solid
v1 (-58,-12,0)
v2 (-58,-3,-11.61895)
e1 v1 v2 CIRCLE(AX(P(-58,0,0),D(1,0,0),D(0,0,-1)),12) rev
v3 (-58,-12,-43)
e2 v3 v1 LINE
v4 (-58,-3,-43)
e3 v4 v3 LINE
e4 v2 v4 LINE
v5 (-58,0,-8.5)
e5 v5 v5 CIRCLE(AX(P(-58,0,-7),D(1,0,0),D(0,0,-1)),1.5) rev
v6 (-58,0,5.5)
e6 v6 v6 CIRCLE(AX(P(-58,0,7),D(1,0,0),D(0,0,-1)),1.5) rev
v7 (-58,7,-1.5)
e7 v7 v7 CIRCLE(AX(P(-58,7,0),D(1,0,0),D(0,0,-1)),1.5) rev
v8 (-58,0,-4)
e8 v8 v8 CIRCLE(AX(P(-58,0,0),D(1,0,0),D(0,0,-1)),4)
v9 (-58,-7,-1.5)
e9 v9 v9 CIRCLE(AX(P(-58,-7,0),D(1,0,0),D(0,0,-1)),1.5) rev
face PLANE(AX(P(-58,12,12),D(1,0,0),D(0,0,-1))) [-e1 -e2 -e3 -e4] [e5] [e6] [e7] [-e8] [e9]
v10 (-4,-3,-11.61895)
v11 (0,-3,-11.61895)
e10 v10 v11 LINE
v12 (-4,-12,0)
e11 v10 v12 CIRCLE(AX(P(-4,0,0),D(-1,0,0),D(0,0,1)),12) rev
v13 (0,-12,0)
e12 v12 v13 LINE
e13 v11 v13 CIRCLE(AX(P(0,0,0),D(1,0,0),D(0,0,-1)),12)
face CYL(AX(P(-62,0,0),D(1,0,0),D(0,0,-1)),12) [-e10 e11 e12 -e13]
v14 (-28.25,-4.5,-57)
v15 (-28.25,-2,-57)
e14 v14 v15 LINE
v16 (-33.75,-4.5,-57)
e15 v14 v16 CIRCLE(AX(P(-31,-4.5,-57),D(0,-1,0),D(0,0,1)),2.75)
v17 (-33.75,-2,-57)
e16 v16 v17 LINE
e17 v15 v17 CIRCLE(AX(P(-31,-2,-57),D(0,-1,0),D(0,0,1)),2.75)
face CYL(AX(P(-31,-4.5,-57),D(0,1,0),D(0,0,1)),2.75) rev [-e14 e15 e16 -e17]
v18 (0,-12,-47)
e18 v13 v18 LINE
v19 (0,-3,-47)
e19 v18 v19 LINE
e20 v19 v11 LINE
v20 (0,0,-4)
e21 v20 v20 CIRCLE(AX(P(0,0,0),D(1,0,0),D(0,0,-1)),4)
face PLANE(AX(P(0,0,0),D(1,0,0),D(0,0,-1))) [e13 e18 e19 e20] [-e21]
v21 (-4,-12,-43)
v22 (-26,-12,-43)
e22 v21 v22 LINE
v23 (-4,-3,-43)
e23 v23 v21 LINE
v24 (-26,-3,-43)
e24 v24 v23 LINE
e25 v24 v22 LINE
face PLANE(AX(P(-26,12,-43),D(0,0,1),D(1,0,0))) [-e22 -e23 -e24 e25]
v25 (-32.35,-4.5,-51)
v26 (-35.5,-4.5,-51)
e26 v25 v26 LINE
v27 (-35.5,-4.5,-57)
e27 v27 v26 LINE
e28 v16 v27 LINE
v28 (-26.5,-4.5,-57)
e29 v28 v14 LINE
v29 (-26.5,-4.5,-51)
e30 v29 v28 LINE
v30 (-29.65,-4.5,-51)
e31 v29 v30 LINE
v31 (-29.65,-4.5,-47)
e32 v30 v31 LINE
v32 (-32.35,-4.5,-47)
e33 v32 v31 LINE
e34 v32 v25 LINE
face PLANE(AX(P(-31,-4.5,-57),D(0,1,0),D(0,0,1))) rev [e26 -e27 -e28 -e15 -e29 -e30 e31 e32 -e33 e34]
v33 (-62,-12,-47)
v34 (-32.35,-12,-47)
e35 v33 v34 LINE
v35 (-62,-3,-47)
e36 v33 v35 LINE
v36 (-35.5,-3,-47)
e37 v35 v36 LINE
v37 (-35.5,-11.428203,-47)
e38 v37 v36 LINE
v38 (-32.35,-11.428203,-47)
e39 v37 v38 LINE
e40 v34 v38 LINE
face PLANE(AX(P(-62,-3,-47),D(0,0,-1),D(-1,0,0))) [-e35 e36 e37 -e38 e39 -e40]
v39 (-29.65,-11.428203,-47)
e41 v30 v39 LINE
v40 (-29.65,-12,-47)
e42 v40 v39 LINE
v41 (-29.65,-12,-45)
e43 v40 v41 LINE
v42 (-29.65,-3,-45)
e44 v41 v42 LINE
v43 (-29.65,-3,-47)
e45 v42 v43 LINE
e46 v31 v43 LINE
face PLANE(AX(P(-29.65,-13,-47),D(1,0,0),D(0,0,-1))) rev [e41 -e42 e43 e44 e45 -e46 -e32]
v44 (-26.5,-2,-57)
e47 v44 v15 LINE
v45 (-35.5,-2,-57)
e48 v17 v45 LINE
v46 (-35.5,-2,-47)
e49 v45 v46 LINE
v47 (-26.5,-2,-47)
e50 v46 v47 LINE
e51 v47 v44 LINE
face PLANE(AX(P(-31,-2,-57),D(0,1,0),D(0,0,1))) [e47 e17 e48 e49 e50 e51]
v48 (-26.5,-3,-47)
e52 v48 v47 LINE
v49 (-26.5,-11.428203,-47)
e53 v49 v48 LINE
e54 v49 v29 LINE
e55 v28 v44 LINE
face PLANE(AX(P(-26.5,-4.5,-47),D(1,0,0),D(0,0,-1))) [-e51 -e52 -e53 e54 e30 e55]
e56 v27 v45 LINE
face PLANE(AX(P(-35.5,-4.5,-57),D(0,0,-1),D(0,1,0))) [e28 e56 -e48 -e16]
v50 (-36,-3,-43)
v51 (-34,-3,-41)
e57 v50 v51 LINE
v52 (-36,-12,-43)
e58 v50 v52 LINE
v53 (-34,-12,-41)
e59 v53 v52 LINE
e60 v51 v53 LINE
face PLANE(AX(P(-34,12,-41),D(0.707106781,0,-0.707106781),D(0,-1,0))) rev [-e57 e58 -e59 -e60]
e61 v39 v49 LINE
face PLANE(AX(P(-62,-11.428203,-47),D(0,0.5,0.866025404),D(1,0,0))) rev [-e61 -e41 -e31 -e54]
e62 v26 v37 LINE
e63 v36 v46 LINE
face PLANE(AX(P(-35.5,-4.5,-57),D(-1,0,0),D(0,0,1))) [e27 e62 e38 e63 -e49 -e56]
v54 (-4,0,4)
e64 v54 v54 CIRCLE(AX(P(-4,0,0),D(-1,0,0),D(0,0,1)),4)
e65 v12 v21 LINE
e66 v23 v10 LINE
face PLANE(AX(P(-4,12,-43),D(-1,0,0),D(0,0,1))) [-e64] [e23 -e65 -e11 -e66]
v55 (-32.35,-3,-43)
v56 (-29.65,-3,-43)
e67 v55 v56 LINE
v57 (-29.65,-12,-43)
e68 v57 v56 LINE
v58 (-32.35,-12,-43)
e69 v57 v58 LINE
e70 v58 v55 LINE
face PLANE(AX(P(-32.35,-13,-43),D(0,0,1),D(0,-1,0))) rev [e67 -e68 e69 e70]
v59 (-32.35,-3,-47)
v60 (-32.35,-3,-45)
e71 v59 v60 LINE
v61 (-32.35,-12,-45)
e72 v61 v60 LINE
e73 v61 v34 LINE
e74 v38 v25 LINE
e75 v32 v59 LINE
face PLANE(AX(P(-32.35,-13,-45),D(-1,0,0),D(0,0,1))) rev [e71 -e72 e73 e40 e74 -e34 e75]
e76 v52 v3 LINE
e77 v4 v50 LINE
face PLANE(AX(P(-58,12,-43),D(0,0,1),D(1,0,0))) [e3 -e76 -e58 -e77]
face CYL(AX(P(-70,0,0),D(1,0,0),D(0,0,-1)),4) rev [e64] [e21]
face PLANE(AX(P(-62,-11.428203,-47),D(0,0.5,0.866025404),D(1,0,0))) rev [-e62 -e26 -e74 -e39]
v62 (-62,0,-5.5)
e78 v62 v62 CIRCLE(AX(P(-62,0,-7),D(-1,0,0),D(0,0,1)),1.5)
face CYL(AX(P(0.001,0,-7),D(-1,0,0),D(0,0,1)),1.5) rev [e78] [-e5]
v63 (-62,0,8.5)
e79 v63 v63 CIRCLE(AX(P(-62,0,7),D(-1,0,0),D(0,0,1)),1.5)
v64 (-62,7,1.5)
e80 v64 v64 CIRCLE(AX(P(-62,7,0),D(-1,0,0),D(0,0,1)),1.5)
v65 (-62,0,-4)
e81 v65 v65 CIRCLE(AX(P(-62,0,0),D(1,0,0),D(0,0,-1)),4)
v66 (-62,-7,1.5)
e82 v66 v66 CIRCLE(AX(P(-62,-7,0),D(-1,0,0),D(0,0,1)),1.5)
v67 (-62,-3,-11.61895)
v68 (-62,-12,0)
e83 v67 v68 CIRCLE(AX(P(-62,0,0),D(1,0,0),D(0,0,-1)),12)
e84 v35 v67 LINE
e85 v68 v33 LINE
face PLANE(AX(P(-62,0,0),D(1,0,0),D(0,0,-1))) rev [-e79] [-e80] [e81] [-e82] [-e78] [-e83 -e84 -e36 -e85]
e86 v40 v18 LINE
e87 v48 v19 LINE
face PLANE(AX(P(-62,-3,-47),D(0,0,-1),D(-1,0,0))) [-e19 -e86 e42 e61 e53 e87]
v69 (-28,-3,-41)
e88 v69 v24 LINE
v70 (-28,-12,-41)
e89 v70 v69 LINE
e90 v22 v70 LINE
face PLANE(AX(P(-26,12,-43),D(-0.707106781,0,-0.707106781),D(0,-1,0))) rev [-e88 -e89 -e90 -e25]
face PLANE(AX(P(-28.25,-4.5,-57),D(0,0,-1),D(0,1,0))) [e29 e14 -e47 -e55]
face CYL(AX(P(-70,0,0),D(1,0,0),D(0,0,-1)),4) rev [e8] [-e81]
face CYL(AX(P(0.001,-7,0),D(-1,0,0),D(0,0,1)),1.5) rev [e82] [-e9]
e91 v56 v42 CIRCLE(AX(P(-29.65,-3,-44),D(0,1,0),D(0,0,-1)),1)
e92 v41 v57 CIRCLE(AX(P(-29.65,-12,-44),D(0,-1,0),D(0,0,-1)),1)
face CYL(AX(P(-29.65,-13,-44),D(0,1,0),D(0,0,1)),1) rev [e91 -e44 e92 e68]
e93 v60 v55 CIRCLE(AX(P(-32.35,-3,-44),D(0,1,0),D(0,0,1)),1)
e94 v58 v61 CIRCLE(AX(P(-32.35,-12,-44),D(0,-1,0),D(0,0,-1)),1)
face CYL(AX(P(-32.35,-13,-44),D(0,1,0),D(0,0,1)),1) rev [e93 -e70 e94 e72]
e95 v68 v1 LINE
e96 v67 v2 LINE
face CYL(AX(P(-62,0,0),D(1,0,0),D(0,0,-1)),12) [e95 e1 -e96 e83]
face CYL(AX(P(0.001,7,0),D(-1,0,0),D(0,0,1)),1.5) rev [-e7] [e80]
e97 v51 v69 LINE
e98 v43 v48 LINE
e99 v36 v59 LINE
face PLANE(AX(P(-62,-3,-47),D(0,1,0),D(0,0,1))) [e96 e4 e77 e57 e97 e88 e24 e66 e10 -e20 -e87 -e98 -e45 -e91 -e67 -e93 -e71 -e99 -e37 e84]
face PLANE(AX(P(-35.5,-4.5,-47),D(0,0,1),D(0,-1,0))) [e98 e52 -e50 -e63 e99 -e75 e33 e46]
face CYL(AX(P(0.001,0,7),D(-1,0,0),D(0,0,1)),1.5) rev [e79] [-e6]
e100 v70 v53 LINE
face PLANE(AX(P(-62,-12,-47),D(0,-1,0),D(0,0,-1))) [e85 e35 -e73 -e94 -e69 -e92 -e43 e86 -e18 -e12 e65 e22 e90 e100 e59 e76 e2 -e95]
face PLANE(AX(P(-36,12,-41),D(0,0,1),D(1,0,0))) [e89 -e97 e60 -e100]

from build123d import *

# Parameters (mm, degrees)
BOSS_EXTRUDE1_DEPTH      = 62
CUT_EXTRUDE1_DEPTH       = 12
CUT_EXTRUDE1_DEPTH_BACK  = 12
BOSS_EXTRUDE2_DEPTH      = 1
BOSS_EXTRUDE2_DEPTH_BACK = 1.5
CUT_EXTRUDE3_DEPTH       = 10
CHAMFER2_SIZE            = 2
CHAMFER3_SIZE            = 2
CHAMFER4_SIZE            = 4
CHAMFER4_SIZE2           = 6.92820323
SKETCH7_R                = 4
CUT_EXTRUDE4_DEPTH       = 70
CUT_EXTRUDE5_REACH       = 87.071
SKETCH8_R                = 1.5


with BuildPart() as part:
    # Sketch1 → Boss-Extrude1 (new body)
    with BuildSketch(Plane(origin=(0, 0, 0), x_dir=(0, 0, -1), z_dir=(1, 0, 0))):
        with BuildLine():
            Line((47, -12), (0, -12))
            ThreePointArc((0, -12), (-7.348469228, 9.486832981), (11.618950039, -3))
            Line((11.618950039, -3), (47, -3))
            Line((47, -3), (47, -12))
        make_face()
    extrude(amount=-BOSS_EXTRUDE1_DEPTH)

    # Sketch2 → Cut-Extrude1 (cut, two sides: drawn at the far end of the back side and taken through both)
    with BuildSketch(Plane(origin=(0, 0, 0), x_dir=(1, 0, 0), z_dir=(0, 1, 0)).offset(-CUT_EXTRUDE1_DEPTH_BACK)):
        Polygon((-58, -12), (-58, 43), (-36, 43), (-36, 41), (-26, 41), (-26, 43), (-4, 43), (-4, -12), align=None)
    extrude(amount=CUT_EXTRUDE1_DEPTH + CUT_EXTRUDE1_DEPTH_BACK, mode=Mode.SUBTRACT)

    # Sketch3 → Boss-Extrude2 (add, two sides: drawn at the far end of the back side and taken through both)
    with BuildSketch(Plane(origin=(0, -3, 0), x_dir=(1, 0, 0), z_dir=(0, 1, 0)).offset(-BOSS_EXTRUDE2_DEPTH_BACK)):
        with BuildLine():
            Line((-35.5, 57), (-35.5, 47))
            Line((-35.5, 47), (-26.5, 47))
            Line((-26.5, 47), (-26.5, 57))
            Line((-26.5, 57), (-28.25, 57))
            ThreePointArc((-28.25, 57), (-31, 54.25), (-33.75, 57))
            Line((-33.75, 57), (-35.5, 57))
        make_face()
    extrude(amount=BOSS_EXTRUDE2_DEPTH + BOSS_EXTRUDE2_DEPTH_BACK)

    # Sketch5 → Cut-Extrude3 (cut)
    with BuildSketch(Plane(origin=(0, -3, 0), x_dir=(1, 0, 0), z_dir=(0, 1, 0))):
        with BuildLine():
            Line((-32.35, 43), (-29.65, 43))
            ThreePointArc((-29.65, 43), (-28.65, 44), (-29.65, 45))
            Line((-29.65, 45), (-29.65, 47))
            Line((-29.65, 47), (-32.35, 47))
            Line((-32.35, 47), (-32.35, 45))
            ThreePointArc((-32.35, 45), (-33.35, 44), (-32.35, 43))
        make_face()
    extrude(amount=-CUT_EXTRUDE3_DEPTH, mode=Mode.SUBTRACT)

    # Chamfer2
    chamfer2_edges = [part.edges().sort_by_distance(p)[0] for p in [
        (-26, -7.5, -41),
    ]]
    chamfer(chamfer2_edges, length=CHAMFER2_SIZE - 0.0001)  # a hair under: the kernel refuses the full size

    # Chamfer3
    chamfer3_edges = [part.edges().sort_by_distance(p)[0] for p in [
        (-36, -7.5, -41),
    ]]
    chamfer(chamfer3_edges, length=CHAMFER3_SIZE - 0.0001)  # a hair under: the kernel refuses the full size

    # Chamfer4
    chamfer4_edges = [part.edges().sort_by_distance(p)[0] for p in [
        (-33.925, -4.5, -47),
        (-28.075, -4.5, -47),
    ]]
    chamfer4_side = [part.faces().sort_by_distance(p)[0] for p in [
        (-31, -4.5, -51.417170305),
    ]]
    chamfer(chamfer4_edges, length=CHAMFER4_SIZE, length2=CHAMFER4_SIZE2, reference=chamfer4_side[0])

    # Sketch7 → Cut-Extrude4 (cut)
    with BuildSketch(Plane(origin=(0, 0, 0), x_dir=(0, 0, -1), z_dir=(1, 0, 0))):
        Circle(SKETCH7_R)
    extrude(amount=-CUT_EXTRUDE4_DEPTH, mode=Mode.SUBTRACT)

    # Sketch8 → Cut-Extrude5 (cut, up to next)
    with BuildSketch(Plane.ZY.offset(62), mode=Mode.PRIVATE) as cut_extrude5_sk1:
        with Locations((0, 7)):
            Circle(SKETCH8_R)
    cut_extrude5_tool1 = extrude(cut_extrude5_sk1.sketch, amount=-CUT_EXTRUDE5_REACH, mode=Mode.PRIVATE) & part.part
    # Sketch8 → Cut-Extrude5 (cut, up to next)
    with BuildSketch(Plane.ZY.offset(62), mode=Mode.PRIVATE) as cut_extrude5_sk2:
        with Locations((7, 0)):
            Circle(SKETCH8_R)
    cut_extrude5_tool2 = extrude(cut_extrude5_sk2.sketch, amount=-CUT_EXTRUDE5_REACH, mode=Mode.PRIVATE) & part.part
    # Sketch8 → Cut-Extrude5 (cut, up to next)
    with BuildSketch(Plane.ZY.offset(62), mode=Mode.PRIVATE) as cut_extrude5_sk3:
        with Locations((0, -7)):
            Circle(SKETCH8_R)
    cut_extrude5_tool3 = extrude(cut_extrude5_sk3.sketch, amount=-CUT_EXTRUDE5_REACH, mode=Mode.PRIVATE) & part.part
    # Sketch8 → Cut-Extrude5 (cut, up to next)
    with BuildSketch(Plane.ZY.offset(62), mode=Mode.PRIVATE) as cut_extrude5_sk4:
        with Locations((-7, 0)):
            Circle(SKETCH8_R)
    cut_extrude5_tool4 = extrude(cut_extrude5_sk4.sketch, amount=-CUT_EXTRUDE5_REACH, mode=Mode.PRIVATE) & part.part
    add(cut_extrude5_tool1.solids().sort_by_distance((-62, 7, 0))[0], mode=Mode.SUBTRACT)
    add(cut_extrude5_tool2.solids().sort_by_distance((-62, 0, 7))[0], mode=Mode.SUBTRACT)
    add(cut_extrude5_tool3.solids().sort_by_distance((-62, -7, 0))[0], mode=Mode.SUBTRACT)
    add(cut_extrude5_tool4.solids().sort_by_distance((-62, 0, -7))[0], mode=Mode.SUBTRACT)


solid = part.part
